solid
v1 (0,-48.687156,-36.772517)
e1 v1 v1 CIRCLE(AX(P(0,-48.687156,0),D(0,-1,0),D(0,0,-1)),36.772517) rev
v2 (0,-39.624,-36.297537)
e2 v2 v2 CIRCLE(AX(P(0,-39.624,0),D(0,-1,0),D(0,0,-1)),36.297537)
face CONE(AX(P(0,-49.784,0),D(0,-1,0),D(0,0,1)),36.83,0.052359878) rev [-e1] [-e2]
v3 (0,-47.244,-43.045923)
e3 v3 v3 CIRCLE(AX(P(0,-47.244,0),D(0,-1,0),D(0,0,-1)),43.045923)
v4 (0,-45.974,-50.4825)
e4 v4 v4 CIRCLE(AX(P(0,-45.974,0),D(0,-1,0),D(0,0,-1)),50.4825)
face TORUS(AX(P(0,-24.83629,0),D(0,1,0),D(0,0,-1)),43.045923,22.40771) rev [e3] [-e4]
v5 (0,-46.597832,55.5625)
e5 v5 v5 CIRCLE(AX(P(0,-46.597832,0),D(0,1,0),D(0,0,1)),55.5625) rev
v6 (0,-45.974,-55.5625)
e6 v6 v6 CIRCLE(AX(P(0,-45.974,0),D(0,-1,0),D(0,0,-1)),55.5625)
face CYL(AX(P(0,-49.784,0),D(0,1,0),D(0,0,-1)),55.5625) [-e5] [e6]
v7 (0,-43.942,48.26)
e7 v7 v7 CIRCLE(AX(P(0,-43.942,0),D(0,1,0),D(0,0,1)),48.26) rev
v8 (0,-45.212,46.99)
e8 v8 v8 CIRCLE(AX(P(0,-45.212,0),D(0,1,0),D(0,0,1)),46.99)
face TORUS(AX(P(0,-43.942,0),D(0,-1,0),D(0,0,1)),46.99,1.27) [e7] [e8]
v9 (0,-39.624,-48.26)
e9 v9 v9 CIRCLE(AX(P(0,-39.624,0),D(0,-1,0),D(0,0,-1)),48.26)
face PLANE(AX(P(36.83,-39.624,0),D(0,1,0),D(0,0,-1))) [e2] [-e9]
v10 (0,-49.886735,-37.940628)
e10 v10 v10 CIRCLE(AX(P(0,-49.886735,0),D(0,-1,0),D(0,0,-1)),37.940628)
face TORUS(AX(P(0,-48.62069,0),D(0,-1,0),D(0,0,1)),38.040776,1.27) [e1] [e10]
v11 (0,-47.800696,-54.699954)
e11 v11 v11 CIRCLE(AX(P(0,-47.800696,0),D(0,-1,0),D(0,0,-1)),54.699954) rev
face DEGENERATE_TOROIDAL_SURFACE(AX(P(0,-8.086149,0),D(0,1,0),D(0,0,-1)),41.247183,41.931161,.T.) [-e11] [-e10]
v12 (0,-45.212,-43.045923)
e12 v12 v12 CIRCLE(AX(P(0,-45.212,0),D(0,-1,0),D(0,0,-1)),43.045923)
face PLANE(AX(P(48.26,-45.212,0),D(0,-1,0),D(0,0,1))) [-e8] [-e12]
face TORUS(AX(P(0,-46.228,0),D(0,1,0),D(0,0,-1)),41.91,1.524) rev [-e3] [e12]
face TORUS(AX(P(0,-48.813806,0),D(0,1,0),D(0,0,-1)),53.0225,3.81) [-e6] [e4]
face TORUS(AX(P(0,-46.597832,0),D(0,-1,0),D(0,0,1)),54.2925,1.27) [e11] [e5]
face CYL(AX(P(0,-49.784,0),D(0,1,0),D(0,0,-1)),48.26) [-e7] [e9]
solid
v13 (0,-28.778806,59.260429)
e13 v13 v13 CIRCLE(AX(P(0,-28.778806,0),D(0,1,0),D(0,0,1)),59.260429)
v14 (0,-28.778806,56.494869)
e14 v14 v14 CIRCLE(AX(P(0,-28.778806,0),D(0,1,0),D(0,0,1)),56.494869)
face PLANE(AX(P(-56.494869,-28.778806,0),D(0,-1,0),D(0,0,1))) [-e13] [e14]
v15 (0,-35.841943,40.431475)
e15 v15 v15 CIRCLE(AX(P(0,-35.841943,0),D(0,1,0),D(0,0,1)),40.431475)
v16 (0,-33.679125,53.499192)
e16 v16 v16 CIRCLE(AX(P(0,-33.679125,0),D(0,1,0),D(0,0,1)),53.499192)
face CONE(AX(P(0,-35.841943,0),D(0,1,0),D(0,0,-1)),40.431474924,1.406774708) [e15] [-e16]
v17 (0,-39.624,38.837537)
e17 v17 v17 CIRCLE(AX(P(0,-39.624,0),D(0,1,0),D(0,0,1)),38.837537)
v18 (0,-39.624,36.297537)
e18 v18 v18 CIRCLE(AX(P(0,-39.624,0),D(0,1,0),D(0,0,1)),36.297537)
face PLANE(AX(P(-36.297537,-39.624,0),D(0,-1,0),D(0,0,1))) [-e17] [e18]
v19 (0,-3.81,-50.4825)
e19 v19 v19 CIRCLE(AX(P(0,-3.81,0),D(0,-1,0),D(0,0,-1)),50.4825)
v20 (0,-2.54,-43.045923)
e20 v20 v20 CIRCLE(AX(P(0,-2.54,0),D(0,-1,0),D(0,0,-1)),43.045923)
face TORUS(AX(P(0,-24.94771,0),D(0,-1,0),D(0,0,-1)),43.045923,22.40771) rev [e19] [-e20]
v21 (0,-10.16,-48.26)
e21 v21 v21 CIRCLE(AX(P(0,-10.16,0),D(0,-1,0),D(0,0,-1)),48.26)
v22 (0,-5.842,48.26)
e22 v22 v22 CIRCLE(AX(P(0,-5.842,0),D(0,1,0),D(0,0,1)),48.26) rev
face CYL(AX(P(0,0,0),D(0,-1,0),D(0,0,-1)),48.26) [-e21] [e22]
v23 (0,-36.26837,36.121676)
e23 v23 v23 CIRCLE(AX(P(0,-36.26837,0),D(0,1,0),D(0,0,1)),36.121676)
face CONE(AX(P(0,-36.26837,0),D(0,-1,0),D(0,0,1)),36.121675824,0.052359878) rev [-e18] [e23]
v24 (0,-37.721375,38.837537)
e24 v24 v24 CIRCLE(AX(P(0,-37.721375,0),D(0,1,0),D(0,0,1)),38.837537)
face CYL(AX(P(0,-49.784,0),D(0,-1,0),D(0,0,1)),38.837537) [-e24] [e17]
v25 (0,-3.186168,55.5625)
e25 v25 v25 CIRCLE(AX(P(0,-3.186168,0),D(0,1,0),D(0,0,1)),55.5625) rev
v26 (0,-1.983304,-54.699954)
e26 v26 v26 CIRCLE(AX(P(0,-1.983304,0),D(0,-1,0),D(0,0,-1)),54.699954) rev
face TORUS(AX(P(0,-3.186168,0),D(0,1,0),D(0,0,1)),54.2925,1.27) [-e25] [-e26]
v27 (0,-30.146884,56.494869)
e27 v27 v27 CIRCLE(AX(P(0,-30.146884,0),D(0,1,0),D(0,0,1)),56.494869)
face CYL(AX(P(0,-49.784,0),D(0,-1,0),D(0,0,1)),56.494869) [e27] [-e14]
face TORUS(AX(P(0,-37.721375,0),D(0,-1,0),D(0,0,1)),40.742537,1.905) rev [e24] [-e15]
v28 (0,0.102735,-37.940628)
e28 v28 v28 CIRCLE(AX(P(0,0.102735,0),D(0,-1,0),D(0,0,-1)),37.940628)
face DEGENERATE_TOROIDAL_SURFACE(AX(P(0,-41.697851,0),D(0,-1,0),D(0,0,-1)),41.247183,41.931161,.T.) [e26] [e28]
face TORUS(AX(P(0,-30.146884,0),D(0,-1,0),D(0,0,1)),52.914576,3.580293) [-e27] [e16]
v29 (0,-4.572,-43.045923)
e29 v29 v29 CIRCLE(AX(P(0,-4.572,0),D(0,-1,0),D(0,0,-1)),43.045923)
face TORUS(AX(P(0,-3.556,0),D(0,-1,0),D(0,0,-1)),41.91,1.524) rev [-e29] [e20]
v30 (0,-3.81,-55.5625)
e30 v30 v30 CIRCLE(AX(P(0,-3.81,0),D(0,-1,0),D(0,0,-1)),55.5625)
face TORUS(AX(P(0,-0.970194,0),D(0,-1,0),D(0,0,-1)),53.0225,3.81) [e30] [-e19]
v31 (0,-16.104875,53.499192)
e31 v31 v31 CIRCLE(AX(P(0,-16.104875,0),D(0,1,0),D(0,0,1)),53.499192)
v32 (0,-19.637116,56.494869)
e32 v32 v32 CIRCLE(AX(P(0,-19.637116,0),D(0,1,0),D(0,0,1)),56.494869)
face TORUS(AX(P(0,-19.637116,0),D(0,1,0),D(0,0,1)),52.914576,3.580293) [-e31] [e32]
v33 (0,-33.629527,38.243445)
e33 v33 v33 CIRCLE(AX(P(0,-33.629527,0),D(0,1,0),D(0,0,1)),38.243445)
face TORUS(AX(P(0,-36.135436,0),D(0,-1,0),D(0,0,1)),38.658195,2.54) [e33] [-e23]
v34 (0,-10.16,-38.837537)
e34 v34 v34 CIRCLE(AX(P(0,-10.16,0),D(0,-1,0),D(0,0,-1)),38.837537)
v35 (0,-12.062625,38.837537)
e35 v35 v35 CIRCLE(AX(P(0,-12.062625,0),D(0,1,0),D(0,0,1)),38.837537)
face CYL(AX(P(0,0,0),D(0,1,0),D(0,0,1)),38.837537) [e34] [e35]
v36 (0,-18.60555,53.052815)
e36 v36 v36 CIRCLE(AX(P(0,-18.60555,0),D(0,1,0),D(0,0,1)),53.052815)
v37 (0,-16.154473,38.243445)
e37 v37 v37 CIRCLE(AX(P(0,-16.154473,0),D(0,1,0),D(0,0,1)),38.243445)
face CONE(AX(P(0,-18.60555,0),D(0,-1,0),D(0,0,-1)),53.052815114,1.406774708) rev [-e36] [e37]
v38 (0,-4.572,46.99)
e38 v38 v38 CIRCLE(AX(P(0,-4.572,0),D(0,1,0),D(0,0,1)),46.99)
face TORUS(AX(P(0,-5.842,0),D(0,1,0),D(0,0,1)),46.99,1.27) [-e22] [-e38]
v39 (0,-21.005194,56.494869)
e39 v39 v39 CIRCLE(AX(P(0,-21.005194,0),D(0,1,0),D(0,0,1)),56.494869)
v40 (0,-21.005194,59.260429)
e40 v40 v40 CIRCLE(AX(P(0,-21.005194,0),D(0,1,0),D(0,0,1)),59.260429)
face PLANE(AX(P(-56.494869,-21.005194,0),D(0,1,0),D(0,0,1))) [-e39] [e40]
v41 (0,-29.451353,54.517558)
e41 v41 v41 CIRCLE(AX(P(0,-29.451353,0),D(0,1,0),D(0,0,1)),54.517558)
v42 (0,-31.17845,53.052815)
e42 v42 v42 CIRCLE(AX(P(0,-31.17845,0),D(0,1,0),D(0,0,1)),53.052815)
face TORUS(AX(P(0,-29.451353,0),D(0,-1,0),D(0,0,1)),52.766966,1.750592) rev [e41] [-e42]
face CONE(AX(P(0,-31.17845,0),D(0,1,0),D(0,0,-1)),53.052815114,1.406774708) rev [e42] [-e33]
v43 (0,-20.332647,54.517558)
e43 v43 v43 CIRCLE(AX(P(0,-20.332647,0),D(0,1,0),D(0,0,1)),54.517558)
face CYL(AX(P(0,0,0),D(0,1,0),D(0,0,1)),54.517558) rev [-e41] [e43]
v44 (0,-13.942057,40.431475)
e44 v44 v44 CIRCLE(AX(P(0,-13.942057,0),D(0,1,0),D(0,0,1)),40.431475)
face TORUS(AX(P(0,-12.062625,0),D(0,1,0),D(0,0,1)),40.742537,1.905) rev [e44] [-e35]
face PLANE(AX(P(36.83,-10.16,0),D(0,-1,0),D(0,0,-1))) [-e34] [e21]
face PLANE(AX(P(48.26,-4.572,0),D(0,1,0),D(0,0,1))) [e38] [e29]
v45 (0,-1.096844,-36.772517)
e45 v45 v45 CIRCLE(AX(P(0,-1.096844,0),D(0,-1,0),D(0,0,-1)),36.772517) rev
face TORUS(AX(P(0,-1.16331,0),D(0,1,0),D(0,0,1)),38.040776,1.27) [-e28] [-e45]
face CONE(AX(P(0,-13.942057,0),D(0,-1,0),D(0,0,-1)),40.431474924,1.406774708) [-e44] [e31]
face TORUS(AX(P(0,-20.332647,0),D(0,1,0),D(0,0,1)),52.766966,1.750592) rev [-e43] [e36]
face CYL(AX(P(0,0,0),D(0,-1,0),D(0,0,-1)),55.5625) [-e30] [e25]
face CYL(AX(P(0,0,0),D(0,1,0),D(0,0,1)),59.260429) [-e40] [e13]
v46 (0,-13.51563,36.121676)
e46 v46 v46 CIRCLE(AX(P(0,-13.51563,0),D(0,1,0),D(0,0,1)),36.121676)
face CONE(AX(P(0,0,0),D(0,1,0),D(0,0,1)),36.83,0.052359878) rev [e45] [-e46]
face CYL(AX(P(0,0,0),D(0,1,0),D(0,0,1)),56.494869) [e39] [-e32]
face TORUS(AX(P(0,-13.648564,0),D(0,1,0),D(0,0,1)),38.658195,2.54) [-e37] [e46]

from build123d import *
from build123d.topology import SkipClean

# Parameters (mm, degrees)
DRAFT1_ANGLE = 3
FILLET3_R    = 1.27
FILLET4_R    = 1.27
FILLET5_R    = 1.27


with BuildPart() as part:
    # Sketch1 → Revolve1 (revolve)
    with BuildSketch(Plane.XY):
        with BuildLine():
            Line((36.83, 0), (36.83, -10.16))
            Line((36.83, -10.16), (48.26, -10.16))
            Line((48.26, -10.16), (48.26, -4.572))
            Line((48.26, -4.572), (43.045922533, -4.572))
            ThreePointArc((43.045922533, -4.572), (40.386, -3.556), (43.045922533, -2.54))
            ThreePointArc((43.045922533, -2.54), (46.818043436, -2.859781813), (50.4825, -3.81))
            ThreePointArc((50.4825, -3.81), (53.0225, -4.780193669), (55.5625, -3.81))
            Line((55.5625, -3.81), (55.5625, -2.286))
            ThreePointArc((55.5625, -2.286), (46.326524815, -0.075470262), (36.83, 0))
        make_face()
    revolve(axis=Axis((0, 0, 0), (0, 1, 0)))

    # Draft1
    draft1_faces = [part.faces().sort_by_distance(p)[0] for p in [
        (-36.83, -5.08, 0),
    ]]
    draft(draft1_faces, Plane.ZX, DRAFT1_ANGLE)

    # Fillet3
    fillet3_edges = [part.edges().sort_by_distance(p)[0] for p in [
        (-36.83, 0, 0),
    ]]
    fillet(fillet3_edges, radius=FILLET3_R)

    # Fillet4
    fillet4_edges = [part.edges().sort_by_distance(p)[0] for p in [
        (-55.5625, -2.286, 0),
    ]]
    fillet(fillet4_edges, radius=FILLET4_R)

    # Fillet5
    fillet5_edges = [part.edges().sort_by_distance(p)[0] for p in [
        (-48.26, -4.572, 0),
    ]]
    fillet(fillet5_edges, radius=FILLET5_R)


with BuildPart() as body_2:
    # Mirror4: mirrored copy
    add(part.part.mirror(Plane.ZX.offset(-24.892)))


with BuildPart() as part_1:
    with SkipClean():  # the faces are left unmerged after this step: merging them gives an invalid solid
        add(part.part)

        # Sketch2 → Revolve2 (revolve)
        with BuildSketch(Plane.XY):
            with BuildLine():
                Line((-59.260429256, -24.892), (-54.517557914, -24.892))
                Line((-54.517557914, -24.892), (-54.517557914, -21.005193817))
                Line((-54.517557914, -21.005193817), (-54.517557914, -20.332646756))
                ThreePointArc((-54.517557914, -20.332646756), (-54.102064725, -19.200355491), (-53.052815114, -18.605550185))
                Line((-53.052815114, -18.605550185), (-38.243445457, -16.154473362))
                ThreePointArc((-38.243445457, -16.154473362), (-36.67870771, -15.240176366), (-36.121675824, -13.515630429))
                Line((-36.121675824, -13.515630429), (-36.297536962, -10.16))
                Line((-36.297536962, -10.16), (-38.837536962, -10.16))
                Line((-38.837536962, -10.16), (-38.837536962, -12.062624512))
                ThreePointArc((-38.837536962, -12.062624512), (-39.289678025, -13.294787613), (-40.431474924, -13.942056716))
                Line((-40.431474924, -13.942056716), (-53.499191571, -16.10487513))
                ThreePointArc((-53.499191571, -16.10487513), (-55.645106368, -17.321364985), (-56.494868876, -19.637115741))
                Line((-56.494868876, -19.637115741), (-56.494868876, -21.005193817))
                Line((-56.494868876, -21.005193817), (-59.260429256, -21.005193817))
                Line((-59.260429256, -21.005193817), (-59.260429256, -24.892))
            make_face()
        revolve2 = revolve(axis=Axis((0, 0, 0), (0, -1, 0)))

    # Mirror5: Revolve2 across plane
    with SkipClean():  # the faces are left unmerged after this step: merging them gives an invalid solid
        add(revolve2.mirror(Plane.ZX.offset(-24.892)))


solid = Compound([body_2.part, part_1.part])
